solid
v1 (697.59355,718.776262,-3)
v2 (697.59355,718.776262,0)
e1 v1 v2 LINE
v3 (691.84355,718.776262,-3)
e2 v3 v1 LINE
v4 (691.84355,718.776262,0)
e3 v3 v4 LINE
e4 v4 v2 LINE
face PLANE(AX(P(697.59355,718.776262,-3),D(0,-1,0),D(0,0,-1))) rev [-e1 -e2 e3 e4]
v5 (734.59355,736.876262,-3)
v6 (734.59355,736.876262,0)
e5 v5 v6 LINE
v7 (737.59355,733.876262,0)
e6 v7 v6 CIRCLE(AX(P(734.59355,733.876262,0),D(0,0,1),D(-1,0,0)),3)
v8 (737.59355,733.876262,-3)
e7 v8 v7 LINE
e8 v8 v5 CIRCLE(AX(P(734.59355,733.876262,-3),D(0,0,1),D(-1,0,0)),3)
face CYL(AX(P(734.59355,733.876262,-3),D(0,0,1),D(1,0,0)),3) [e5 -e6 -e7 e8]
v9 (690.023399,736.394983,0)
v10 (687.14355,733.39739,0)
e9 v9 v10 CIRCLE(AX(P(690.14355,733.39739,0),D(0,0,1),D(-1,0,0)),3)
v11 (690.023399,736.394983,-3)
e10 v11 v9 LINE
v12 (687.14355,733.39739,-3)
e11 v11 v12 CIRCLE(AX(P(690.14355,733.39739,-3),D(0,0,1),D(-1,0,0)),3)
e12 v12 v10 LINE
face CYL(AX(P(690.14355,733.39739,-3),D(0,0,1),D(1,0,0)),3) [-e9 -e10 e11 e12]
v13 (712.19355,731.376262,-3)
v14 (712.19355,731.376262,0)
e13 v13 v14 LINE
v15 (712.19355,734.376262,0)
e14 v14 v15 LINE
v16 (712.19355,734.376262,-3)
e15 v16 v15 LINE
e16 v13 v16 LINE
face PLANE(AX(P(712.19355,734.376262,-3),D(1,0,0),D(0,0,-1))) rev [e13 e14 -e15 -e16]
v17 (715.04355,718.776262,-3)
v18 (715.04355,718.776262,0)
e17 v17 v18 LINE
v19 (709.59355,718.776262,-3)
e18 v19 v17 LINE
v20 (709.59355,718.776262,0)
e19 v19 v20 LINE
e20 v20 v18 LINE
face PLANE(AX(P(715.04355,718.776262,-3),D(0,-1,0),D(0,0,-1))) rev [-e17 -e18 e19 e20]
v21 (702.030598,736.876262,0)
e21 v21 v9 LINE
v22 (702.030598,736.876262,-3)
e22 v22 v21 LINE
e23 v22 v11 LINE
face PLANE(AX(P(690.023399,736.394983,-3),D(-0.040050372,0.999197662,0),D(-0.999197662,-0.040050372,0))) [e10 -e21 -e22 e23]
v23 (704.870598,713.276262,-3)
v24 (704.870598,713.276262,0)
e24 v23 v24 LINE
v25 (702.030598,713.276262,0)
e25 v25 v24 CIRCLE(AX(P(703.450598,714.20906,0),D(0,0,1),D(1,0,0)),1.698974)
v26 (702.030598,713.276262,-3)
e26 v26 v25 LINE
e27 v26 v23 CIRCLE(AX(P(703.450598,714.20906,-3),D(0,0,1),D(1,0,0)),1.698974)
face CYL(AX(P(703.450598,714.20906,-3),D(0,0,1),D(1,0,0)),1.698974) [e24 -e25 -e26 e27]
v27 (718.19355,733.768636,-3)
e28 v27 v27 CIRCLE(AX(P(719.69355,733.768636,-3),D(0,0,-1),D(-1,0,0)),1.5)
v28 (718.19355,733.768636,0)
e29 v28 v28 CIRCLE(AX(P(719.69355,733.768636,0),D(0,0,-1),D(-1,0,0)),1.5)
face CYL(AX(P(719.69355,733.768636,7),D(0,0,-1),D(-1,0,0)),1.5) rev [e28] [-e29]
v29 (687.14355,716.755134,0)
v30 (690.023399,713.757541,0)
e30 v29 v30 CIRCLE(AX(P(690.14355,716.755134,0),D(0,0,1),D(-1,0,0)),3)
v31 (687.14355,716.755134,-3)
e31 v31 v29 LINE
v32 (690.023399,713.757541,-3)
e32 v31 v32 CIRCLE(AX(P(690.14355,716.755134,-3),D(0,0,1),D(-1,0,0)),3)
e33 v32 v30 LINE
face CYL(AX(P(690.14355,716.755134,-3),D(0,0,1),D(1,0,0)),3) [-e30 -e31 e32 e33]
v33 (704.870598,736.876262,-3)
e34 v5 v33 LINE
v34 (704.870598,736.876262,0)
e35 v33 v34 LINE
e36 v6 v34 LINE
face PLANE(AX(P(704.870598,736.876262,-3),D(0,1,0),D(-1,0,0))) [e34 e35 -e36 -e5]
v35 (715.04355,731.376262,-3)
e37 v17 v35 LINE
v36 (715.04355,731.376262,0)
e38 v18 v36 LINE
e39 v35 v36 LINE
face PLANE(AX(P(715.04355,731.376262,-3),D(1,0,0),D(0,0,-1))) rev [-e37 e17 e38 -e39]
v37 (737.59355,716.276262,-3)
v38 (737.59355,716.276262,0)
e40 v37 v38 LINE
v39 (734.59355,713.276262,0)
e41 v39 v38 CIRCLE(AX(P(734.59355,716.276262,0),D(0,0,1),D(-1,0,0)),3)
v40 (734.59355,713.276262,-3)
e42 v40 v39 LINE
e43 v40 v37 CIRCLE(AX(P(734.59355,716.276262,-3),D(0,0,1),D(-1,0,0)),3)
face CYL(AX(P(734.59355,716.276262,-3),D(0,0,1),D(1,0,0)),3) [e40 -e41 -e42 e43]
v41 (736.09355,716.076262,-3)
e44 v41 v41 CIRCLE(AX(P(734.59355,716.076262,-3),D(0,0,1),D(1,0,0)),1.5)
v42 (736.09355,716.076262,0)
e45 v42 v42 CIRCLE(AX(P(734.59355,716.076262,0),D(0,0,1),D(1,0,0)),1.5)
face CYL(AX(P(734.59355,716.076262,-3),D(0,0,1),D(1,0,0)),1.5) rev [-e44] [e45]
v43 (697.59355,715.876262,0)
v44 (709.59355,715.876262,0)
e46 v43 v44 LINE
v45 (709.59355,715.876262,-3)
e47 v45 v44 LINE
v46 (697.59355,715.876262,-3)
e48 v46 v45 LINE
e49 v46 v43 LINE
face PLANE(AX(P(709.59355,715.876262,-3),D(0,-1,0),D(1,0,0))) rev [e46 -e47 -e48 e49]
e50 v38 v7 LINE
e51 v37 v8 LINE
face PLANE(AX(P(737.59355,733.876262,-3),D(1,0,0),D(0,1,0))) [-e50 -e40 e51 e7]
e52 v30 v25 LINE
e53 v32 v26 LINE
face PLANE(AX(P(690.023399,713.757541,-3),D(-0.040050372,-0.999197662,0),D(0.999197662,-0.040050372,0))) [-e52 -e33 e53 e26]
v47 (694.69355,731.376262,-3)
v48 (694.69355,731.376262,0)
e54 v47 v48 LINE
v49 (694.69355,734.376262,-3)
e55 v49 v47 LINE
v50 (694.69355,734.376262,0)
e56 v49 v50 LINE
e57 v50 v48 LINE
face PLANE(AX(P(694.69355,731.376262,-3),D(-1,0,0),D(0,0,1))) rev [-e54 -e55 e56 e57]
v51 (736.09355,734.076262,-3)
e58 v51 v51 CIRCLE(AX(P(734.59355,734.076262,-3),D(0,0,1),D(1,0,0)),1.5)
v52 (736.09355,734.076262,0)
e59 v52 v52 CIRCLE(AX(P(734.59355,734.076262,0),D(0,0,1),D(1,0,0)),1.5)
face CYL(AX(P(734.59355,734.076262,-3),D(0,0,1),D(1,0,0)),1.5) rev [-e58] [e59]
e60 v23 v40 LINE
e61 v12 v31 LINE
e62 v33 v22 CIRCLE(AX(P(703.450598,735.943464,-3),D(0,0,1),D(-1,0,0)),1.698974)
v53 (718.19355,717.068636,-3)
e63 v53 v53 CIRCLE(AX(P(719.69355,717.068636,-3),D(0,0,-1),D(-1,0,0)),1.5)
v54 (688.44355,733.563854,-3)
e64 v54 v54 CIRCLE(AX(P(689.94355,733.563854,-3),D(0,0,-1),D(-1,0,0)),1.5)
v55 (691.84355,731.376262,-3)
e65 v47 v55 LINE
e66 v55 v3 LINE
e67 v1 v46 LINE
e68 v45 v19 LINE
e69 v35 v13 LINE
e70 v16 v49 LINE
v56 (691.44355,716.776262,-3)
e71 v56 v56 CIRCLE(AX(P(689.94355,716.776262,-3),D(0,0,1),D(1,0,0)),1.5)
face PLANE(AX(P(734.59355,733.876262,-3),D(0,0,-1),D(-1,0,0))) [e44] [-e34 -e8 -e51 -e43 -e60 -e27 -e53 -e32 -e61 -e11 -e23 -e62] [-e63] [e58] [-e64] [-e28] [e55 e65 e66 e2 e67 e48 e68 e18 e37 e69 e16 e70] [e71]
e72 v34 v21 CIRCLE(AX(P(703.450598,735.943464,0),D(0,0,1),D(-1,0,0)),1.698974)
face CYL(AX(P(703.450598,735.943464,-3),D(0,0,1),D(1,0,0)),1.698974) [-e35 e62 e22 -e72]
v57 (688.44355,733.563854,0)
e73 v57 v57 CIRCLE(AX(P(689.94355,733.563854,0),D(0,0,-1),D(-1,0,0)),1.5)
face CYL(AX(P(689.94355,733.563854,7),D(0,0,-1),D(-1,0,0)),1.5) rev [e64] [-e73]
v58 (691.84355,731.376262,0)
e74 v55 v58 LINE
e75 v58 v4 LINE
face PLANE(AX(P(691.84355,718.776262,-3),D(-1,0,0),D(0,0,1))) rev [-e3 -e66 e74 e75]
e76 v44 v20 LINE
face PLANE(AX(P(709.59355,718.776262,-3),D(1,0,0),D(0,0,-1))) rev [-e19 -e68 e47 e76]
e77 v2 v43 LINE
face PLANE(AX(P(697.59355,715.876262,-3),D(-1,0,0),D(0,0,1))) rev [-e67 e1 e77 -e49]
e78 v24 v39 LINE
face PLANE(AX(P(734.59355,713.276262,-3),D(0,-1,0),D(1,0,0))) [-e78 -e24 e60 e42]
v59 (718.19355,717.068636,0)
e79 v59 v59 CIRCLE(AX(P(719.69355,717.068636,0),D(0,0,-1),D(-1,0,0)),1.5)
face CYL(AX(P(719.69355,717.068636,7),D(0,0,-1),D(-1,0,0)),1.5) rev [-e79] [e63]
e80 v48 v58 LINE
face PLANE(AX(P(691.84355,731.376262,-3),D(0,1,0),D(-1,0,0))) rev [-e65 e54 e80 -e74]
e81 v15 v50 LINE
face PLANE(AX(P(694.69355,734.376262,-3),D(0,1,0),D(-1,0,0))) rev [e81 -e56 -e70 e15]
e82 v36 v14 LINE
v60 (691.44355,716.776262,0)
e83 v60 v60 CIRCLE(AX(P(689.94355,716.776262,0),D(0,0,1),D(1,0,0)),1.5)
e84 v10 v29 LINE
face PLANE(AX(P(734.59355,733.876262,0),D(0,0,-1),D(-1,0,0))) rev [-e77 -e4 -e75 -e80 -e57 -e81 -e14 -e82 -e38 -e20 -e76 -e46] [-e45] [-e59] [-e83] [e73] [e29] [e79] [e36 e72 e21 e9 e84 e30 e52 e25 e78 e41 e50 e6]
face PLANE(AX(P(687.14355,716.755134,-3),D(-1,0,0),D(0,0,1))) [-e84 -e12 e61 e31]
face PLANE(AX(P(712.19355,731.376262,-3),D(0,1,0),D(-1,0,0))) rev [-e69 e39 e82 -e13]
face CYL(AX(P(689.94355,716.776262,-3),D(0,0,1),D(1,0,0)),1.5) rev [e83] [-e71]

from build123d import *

# Parameters (mm, degrees)
ESQUISSE1_R               = 1.5
T_LE_DE_BASE_PLI_E1_DEPTH = 3
ESQUISSE6_R               = 1.5
ENL_V_MAT_EXTRU_2_DEPTH   = 10


# Sheet-metal steps are written as plain solids
with BuildPart() as part:
    # Esquisse1 → Tôle de base pliée1 (new body)
    with BuildSketch(Plane.XY):
        with BuildLine():
            Line((737.593549902, 733.8762623), (737.593549902, 716.2762623))
            ThreePointArc((737.593549902, 716.2762623), (736.714870246, 714.154941957), (734.593549902, 713.2762623))
            Line((734.593549902, 713.2762623), (704.870597735, 713.2762623))
            ThreePointArc((704.870597735, 713.2762623), (703.450597735, 712.510086472), (702.030597735, 713.2762623))
            Line((702.030597735, 713.2762623), (690.023398786, 713.757541233))
            ThreePointArc((690.023398786, 713.757541233), (687.980166748, 714.67672778), (687.143549902, 716.755134219))
            Line((687.143549902, 716.755134219), (687.143549902, 733.397390382))
            ThreePointArc((687.143549902, 733.397390382), (687.980166748, 735.475796821), (690.023398786, 736.394983368))
            Line((690.023398786, 736.394983368), (702.030597735, 736.8762623))
            ThreePointArc((702.030597735, 736.8762623), (703.450597735, 737.642438129), (704.870597735, 736.8762623))
            Line((704.870597735, 736.8762623), (734.593549902, 736.8762623))
            ThreePointArc((734.593549902, 736.8762623), (736.714870246, 735.997582644), (737.593549902, 733.8762623))
        make_face()
        with Locations((689.943549902, 716.7762623)):
            Circle(ESQUISSE1_R, mode=Mode.SUBTRACT)
        with Locations((734.593549902, 716.0762623)):
            Circle(ESQUISSE1_R, mode=Mode.SUBTRACT)
        with Locations((734.593549902, 734.0762623)):
            Circle(ESQUISSE1_R, mode=Mode.SUBTRACT)
        Polygon((694.693549902, 734.3762623), (712.193549902, 734.3762623), (712.193549902, 731.3762623), (715.043549902, 731.3762623), (715.043549902, 718.7762623), (709.593549902, 718.7762623), (709.593549902, 715.8762623), (697.593549902, 715.8762623), (697.593549902, 718.7762623), (691.843549902, 718.7762623), (691.843549902, 731.3762623), (694.693549902, 731.3762623), align=None, mode=Mode.SUBTRACT)
    extrude(amount=-T_LE_DE_BASE_PLI_E1_DEPTH)

    # Esquisse6 → Enlèv. mat.-Extru.2 (cut)
    with BuildSketch(Plane(origin=(0, 0, -3), x_dir=(-1, 0, 0), z_dir=(0, 0, -1))):
        with Locations((-719.693549902, 733.768635687)):
            Circle(ESQUISSE6_R)
        with Locations((-719.693549902, 717.068635687)):
            Circle(ESQUISSE6_R)
        with Locations((-689.943549902, 733.563854452)):
            Circle(ESQUISSE6_R)
    extrude(amount=-ENL_V_MAT_EXTRU_2_DEPTH, mode=Mode.SUBTRACT)


solid = part.part
